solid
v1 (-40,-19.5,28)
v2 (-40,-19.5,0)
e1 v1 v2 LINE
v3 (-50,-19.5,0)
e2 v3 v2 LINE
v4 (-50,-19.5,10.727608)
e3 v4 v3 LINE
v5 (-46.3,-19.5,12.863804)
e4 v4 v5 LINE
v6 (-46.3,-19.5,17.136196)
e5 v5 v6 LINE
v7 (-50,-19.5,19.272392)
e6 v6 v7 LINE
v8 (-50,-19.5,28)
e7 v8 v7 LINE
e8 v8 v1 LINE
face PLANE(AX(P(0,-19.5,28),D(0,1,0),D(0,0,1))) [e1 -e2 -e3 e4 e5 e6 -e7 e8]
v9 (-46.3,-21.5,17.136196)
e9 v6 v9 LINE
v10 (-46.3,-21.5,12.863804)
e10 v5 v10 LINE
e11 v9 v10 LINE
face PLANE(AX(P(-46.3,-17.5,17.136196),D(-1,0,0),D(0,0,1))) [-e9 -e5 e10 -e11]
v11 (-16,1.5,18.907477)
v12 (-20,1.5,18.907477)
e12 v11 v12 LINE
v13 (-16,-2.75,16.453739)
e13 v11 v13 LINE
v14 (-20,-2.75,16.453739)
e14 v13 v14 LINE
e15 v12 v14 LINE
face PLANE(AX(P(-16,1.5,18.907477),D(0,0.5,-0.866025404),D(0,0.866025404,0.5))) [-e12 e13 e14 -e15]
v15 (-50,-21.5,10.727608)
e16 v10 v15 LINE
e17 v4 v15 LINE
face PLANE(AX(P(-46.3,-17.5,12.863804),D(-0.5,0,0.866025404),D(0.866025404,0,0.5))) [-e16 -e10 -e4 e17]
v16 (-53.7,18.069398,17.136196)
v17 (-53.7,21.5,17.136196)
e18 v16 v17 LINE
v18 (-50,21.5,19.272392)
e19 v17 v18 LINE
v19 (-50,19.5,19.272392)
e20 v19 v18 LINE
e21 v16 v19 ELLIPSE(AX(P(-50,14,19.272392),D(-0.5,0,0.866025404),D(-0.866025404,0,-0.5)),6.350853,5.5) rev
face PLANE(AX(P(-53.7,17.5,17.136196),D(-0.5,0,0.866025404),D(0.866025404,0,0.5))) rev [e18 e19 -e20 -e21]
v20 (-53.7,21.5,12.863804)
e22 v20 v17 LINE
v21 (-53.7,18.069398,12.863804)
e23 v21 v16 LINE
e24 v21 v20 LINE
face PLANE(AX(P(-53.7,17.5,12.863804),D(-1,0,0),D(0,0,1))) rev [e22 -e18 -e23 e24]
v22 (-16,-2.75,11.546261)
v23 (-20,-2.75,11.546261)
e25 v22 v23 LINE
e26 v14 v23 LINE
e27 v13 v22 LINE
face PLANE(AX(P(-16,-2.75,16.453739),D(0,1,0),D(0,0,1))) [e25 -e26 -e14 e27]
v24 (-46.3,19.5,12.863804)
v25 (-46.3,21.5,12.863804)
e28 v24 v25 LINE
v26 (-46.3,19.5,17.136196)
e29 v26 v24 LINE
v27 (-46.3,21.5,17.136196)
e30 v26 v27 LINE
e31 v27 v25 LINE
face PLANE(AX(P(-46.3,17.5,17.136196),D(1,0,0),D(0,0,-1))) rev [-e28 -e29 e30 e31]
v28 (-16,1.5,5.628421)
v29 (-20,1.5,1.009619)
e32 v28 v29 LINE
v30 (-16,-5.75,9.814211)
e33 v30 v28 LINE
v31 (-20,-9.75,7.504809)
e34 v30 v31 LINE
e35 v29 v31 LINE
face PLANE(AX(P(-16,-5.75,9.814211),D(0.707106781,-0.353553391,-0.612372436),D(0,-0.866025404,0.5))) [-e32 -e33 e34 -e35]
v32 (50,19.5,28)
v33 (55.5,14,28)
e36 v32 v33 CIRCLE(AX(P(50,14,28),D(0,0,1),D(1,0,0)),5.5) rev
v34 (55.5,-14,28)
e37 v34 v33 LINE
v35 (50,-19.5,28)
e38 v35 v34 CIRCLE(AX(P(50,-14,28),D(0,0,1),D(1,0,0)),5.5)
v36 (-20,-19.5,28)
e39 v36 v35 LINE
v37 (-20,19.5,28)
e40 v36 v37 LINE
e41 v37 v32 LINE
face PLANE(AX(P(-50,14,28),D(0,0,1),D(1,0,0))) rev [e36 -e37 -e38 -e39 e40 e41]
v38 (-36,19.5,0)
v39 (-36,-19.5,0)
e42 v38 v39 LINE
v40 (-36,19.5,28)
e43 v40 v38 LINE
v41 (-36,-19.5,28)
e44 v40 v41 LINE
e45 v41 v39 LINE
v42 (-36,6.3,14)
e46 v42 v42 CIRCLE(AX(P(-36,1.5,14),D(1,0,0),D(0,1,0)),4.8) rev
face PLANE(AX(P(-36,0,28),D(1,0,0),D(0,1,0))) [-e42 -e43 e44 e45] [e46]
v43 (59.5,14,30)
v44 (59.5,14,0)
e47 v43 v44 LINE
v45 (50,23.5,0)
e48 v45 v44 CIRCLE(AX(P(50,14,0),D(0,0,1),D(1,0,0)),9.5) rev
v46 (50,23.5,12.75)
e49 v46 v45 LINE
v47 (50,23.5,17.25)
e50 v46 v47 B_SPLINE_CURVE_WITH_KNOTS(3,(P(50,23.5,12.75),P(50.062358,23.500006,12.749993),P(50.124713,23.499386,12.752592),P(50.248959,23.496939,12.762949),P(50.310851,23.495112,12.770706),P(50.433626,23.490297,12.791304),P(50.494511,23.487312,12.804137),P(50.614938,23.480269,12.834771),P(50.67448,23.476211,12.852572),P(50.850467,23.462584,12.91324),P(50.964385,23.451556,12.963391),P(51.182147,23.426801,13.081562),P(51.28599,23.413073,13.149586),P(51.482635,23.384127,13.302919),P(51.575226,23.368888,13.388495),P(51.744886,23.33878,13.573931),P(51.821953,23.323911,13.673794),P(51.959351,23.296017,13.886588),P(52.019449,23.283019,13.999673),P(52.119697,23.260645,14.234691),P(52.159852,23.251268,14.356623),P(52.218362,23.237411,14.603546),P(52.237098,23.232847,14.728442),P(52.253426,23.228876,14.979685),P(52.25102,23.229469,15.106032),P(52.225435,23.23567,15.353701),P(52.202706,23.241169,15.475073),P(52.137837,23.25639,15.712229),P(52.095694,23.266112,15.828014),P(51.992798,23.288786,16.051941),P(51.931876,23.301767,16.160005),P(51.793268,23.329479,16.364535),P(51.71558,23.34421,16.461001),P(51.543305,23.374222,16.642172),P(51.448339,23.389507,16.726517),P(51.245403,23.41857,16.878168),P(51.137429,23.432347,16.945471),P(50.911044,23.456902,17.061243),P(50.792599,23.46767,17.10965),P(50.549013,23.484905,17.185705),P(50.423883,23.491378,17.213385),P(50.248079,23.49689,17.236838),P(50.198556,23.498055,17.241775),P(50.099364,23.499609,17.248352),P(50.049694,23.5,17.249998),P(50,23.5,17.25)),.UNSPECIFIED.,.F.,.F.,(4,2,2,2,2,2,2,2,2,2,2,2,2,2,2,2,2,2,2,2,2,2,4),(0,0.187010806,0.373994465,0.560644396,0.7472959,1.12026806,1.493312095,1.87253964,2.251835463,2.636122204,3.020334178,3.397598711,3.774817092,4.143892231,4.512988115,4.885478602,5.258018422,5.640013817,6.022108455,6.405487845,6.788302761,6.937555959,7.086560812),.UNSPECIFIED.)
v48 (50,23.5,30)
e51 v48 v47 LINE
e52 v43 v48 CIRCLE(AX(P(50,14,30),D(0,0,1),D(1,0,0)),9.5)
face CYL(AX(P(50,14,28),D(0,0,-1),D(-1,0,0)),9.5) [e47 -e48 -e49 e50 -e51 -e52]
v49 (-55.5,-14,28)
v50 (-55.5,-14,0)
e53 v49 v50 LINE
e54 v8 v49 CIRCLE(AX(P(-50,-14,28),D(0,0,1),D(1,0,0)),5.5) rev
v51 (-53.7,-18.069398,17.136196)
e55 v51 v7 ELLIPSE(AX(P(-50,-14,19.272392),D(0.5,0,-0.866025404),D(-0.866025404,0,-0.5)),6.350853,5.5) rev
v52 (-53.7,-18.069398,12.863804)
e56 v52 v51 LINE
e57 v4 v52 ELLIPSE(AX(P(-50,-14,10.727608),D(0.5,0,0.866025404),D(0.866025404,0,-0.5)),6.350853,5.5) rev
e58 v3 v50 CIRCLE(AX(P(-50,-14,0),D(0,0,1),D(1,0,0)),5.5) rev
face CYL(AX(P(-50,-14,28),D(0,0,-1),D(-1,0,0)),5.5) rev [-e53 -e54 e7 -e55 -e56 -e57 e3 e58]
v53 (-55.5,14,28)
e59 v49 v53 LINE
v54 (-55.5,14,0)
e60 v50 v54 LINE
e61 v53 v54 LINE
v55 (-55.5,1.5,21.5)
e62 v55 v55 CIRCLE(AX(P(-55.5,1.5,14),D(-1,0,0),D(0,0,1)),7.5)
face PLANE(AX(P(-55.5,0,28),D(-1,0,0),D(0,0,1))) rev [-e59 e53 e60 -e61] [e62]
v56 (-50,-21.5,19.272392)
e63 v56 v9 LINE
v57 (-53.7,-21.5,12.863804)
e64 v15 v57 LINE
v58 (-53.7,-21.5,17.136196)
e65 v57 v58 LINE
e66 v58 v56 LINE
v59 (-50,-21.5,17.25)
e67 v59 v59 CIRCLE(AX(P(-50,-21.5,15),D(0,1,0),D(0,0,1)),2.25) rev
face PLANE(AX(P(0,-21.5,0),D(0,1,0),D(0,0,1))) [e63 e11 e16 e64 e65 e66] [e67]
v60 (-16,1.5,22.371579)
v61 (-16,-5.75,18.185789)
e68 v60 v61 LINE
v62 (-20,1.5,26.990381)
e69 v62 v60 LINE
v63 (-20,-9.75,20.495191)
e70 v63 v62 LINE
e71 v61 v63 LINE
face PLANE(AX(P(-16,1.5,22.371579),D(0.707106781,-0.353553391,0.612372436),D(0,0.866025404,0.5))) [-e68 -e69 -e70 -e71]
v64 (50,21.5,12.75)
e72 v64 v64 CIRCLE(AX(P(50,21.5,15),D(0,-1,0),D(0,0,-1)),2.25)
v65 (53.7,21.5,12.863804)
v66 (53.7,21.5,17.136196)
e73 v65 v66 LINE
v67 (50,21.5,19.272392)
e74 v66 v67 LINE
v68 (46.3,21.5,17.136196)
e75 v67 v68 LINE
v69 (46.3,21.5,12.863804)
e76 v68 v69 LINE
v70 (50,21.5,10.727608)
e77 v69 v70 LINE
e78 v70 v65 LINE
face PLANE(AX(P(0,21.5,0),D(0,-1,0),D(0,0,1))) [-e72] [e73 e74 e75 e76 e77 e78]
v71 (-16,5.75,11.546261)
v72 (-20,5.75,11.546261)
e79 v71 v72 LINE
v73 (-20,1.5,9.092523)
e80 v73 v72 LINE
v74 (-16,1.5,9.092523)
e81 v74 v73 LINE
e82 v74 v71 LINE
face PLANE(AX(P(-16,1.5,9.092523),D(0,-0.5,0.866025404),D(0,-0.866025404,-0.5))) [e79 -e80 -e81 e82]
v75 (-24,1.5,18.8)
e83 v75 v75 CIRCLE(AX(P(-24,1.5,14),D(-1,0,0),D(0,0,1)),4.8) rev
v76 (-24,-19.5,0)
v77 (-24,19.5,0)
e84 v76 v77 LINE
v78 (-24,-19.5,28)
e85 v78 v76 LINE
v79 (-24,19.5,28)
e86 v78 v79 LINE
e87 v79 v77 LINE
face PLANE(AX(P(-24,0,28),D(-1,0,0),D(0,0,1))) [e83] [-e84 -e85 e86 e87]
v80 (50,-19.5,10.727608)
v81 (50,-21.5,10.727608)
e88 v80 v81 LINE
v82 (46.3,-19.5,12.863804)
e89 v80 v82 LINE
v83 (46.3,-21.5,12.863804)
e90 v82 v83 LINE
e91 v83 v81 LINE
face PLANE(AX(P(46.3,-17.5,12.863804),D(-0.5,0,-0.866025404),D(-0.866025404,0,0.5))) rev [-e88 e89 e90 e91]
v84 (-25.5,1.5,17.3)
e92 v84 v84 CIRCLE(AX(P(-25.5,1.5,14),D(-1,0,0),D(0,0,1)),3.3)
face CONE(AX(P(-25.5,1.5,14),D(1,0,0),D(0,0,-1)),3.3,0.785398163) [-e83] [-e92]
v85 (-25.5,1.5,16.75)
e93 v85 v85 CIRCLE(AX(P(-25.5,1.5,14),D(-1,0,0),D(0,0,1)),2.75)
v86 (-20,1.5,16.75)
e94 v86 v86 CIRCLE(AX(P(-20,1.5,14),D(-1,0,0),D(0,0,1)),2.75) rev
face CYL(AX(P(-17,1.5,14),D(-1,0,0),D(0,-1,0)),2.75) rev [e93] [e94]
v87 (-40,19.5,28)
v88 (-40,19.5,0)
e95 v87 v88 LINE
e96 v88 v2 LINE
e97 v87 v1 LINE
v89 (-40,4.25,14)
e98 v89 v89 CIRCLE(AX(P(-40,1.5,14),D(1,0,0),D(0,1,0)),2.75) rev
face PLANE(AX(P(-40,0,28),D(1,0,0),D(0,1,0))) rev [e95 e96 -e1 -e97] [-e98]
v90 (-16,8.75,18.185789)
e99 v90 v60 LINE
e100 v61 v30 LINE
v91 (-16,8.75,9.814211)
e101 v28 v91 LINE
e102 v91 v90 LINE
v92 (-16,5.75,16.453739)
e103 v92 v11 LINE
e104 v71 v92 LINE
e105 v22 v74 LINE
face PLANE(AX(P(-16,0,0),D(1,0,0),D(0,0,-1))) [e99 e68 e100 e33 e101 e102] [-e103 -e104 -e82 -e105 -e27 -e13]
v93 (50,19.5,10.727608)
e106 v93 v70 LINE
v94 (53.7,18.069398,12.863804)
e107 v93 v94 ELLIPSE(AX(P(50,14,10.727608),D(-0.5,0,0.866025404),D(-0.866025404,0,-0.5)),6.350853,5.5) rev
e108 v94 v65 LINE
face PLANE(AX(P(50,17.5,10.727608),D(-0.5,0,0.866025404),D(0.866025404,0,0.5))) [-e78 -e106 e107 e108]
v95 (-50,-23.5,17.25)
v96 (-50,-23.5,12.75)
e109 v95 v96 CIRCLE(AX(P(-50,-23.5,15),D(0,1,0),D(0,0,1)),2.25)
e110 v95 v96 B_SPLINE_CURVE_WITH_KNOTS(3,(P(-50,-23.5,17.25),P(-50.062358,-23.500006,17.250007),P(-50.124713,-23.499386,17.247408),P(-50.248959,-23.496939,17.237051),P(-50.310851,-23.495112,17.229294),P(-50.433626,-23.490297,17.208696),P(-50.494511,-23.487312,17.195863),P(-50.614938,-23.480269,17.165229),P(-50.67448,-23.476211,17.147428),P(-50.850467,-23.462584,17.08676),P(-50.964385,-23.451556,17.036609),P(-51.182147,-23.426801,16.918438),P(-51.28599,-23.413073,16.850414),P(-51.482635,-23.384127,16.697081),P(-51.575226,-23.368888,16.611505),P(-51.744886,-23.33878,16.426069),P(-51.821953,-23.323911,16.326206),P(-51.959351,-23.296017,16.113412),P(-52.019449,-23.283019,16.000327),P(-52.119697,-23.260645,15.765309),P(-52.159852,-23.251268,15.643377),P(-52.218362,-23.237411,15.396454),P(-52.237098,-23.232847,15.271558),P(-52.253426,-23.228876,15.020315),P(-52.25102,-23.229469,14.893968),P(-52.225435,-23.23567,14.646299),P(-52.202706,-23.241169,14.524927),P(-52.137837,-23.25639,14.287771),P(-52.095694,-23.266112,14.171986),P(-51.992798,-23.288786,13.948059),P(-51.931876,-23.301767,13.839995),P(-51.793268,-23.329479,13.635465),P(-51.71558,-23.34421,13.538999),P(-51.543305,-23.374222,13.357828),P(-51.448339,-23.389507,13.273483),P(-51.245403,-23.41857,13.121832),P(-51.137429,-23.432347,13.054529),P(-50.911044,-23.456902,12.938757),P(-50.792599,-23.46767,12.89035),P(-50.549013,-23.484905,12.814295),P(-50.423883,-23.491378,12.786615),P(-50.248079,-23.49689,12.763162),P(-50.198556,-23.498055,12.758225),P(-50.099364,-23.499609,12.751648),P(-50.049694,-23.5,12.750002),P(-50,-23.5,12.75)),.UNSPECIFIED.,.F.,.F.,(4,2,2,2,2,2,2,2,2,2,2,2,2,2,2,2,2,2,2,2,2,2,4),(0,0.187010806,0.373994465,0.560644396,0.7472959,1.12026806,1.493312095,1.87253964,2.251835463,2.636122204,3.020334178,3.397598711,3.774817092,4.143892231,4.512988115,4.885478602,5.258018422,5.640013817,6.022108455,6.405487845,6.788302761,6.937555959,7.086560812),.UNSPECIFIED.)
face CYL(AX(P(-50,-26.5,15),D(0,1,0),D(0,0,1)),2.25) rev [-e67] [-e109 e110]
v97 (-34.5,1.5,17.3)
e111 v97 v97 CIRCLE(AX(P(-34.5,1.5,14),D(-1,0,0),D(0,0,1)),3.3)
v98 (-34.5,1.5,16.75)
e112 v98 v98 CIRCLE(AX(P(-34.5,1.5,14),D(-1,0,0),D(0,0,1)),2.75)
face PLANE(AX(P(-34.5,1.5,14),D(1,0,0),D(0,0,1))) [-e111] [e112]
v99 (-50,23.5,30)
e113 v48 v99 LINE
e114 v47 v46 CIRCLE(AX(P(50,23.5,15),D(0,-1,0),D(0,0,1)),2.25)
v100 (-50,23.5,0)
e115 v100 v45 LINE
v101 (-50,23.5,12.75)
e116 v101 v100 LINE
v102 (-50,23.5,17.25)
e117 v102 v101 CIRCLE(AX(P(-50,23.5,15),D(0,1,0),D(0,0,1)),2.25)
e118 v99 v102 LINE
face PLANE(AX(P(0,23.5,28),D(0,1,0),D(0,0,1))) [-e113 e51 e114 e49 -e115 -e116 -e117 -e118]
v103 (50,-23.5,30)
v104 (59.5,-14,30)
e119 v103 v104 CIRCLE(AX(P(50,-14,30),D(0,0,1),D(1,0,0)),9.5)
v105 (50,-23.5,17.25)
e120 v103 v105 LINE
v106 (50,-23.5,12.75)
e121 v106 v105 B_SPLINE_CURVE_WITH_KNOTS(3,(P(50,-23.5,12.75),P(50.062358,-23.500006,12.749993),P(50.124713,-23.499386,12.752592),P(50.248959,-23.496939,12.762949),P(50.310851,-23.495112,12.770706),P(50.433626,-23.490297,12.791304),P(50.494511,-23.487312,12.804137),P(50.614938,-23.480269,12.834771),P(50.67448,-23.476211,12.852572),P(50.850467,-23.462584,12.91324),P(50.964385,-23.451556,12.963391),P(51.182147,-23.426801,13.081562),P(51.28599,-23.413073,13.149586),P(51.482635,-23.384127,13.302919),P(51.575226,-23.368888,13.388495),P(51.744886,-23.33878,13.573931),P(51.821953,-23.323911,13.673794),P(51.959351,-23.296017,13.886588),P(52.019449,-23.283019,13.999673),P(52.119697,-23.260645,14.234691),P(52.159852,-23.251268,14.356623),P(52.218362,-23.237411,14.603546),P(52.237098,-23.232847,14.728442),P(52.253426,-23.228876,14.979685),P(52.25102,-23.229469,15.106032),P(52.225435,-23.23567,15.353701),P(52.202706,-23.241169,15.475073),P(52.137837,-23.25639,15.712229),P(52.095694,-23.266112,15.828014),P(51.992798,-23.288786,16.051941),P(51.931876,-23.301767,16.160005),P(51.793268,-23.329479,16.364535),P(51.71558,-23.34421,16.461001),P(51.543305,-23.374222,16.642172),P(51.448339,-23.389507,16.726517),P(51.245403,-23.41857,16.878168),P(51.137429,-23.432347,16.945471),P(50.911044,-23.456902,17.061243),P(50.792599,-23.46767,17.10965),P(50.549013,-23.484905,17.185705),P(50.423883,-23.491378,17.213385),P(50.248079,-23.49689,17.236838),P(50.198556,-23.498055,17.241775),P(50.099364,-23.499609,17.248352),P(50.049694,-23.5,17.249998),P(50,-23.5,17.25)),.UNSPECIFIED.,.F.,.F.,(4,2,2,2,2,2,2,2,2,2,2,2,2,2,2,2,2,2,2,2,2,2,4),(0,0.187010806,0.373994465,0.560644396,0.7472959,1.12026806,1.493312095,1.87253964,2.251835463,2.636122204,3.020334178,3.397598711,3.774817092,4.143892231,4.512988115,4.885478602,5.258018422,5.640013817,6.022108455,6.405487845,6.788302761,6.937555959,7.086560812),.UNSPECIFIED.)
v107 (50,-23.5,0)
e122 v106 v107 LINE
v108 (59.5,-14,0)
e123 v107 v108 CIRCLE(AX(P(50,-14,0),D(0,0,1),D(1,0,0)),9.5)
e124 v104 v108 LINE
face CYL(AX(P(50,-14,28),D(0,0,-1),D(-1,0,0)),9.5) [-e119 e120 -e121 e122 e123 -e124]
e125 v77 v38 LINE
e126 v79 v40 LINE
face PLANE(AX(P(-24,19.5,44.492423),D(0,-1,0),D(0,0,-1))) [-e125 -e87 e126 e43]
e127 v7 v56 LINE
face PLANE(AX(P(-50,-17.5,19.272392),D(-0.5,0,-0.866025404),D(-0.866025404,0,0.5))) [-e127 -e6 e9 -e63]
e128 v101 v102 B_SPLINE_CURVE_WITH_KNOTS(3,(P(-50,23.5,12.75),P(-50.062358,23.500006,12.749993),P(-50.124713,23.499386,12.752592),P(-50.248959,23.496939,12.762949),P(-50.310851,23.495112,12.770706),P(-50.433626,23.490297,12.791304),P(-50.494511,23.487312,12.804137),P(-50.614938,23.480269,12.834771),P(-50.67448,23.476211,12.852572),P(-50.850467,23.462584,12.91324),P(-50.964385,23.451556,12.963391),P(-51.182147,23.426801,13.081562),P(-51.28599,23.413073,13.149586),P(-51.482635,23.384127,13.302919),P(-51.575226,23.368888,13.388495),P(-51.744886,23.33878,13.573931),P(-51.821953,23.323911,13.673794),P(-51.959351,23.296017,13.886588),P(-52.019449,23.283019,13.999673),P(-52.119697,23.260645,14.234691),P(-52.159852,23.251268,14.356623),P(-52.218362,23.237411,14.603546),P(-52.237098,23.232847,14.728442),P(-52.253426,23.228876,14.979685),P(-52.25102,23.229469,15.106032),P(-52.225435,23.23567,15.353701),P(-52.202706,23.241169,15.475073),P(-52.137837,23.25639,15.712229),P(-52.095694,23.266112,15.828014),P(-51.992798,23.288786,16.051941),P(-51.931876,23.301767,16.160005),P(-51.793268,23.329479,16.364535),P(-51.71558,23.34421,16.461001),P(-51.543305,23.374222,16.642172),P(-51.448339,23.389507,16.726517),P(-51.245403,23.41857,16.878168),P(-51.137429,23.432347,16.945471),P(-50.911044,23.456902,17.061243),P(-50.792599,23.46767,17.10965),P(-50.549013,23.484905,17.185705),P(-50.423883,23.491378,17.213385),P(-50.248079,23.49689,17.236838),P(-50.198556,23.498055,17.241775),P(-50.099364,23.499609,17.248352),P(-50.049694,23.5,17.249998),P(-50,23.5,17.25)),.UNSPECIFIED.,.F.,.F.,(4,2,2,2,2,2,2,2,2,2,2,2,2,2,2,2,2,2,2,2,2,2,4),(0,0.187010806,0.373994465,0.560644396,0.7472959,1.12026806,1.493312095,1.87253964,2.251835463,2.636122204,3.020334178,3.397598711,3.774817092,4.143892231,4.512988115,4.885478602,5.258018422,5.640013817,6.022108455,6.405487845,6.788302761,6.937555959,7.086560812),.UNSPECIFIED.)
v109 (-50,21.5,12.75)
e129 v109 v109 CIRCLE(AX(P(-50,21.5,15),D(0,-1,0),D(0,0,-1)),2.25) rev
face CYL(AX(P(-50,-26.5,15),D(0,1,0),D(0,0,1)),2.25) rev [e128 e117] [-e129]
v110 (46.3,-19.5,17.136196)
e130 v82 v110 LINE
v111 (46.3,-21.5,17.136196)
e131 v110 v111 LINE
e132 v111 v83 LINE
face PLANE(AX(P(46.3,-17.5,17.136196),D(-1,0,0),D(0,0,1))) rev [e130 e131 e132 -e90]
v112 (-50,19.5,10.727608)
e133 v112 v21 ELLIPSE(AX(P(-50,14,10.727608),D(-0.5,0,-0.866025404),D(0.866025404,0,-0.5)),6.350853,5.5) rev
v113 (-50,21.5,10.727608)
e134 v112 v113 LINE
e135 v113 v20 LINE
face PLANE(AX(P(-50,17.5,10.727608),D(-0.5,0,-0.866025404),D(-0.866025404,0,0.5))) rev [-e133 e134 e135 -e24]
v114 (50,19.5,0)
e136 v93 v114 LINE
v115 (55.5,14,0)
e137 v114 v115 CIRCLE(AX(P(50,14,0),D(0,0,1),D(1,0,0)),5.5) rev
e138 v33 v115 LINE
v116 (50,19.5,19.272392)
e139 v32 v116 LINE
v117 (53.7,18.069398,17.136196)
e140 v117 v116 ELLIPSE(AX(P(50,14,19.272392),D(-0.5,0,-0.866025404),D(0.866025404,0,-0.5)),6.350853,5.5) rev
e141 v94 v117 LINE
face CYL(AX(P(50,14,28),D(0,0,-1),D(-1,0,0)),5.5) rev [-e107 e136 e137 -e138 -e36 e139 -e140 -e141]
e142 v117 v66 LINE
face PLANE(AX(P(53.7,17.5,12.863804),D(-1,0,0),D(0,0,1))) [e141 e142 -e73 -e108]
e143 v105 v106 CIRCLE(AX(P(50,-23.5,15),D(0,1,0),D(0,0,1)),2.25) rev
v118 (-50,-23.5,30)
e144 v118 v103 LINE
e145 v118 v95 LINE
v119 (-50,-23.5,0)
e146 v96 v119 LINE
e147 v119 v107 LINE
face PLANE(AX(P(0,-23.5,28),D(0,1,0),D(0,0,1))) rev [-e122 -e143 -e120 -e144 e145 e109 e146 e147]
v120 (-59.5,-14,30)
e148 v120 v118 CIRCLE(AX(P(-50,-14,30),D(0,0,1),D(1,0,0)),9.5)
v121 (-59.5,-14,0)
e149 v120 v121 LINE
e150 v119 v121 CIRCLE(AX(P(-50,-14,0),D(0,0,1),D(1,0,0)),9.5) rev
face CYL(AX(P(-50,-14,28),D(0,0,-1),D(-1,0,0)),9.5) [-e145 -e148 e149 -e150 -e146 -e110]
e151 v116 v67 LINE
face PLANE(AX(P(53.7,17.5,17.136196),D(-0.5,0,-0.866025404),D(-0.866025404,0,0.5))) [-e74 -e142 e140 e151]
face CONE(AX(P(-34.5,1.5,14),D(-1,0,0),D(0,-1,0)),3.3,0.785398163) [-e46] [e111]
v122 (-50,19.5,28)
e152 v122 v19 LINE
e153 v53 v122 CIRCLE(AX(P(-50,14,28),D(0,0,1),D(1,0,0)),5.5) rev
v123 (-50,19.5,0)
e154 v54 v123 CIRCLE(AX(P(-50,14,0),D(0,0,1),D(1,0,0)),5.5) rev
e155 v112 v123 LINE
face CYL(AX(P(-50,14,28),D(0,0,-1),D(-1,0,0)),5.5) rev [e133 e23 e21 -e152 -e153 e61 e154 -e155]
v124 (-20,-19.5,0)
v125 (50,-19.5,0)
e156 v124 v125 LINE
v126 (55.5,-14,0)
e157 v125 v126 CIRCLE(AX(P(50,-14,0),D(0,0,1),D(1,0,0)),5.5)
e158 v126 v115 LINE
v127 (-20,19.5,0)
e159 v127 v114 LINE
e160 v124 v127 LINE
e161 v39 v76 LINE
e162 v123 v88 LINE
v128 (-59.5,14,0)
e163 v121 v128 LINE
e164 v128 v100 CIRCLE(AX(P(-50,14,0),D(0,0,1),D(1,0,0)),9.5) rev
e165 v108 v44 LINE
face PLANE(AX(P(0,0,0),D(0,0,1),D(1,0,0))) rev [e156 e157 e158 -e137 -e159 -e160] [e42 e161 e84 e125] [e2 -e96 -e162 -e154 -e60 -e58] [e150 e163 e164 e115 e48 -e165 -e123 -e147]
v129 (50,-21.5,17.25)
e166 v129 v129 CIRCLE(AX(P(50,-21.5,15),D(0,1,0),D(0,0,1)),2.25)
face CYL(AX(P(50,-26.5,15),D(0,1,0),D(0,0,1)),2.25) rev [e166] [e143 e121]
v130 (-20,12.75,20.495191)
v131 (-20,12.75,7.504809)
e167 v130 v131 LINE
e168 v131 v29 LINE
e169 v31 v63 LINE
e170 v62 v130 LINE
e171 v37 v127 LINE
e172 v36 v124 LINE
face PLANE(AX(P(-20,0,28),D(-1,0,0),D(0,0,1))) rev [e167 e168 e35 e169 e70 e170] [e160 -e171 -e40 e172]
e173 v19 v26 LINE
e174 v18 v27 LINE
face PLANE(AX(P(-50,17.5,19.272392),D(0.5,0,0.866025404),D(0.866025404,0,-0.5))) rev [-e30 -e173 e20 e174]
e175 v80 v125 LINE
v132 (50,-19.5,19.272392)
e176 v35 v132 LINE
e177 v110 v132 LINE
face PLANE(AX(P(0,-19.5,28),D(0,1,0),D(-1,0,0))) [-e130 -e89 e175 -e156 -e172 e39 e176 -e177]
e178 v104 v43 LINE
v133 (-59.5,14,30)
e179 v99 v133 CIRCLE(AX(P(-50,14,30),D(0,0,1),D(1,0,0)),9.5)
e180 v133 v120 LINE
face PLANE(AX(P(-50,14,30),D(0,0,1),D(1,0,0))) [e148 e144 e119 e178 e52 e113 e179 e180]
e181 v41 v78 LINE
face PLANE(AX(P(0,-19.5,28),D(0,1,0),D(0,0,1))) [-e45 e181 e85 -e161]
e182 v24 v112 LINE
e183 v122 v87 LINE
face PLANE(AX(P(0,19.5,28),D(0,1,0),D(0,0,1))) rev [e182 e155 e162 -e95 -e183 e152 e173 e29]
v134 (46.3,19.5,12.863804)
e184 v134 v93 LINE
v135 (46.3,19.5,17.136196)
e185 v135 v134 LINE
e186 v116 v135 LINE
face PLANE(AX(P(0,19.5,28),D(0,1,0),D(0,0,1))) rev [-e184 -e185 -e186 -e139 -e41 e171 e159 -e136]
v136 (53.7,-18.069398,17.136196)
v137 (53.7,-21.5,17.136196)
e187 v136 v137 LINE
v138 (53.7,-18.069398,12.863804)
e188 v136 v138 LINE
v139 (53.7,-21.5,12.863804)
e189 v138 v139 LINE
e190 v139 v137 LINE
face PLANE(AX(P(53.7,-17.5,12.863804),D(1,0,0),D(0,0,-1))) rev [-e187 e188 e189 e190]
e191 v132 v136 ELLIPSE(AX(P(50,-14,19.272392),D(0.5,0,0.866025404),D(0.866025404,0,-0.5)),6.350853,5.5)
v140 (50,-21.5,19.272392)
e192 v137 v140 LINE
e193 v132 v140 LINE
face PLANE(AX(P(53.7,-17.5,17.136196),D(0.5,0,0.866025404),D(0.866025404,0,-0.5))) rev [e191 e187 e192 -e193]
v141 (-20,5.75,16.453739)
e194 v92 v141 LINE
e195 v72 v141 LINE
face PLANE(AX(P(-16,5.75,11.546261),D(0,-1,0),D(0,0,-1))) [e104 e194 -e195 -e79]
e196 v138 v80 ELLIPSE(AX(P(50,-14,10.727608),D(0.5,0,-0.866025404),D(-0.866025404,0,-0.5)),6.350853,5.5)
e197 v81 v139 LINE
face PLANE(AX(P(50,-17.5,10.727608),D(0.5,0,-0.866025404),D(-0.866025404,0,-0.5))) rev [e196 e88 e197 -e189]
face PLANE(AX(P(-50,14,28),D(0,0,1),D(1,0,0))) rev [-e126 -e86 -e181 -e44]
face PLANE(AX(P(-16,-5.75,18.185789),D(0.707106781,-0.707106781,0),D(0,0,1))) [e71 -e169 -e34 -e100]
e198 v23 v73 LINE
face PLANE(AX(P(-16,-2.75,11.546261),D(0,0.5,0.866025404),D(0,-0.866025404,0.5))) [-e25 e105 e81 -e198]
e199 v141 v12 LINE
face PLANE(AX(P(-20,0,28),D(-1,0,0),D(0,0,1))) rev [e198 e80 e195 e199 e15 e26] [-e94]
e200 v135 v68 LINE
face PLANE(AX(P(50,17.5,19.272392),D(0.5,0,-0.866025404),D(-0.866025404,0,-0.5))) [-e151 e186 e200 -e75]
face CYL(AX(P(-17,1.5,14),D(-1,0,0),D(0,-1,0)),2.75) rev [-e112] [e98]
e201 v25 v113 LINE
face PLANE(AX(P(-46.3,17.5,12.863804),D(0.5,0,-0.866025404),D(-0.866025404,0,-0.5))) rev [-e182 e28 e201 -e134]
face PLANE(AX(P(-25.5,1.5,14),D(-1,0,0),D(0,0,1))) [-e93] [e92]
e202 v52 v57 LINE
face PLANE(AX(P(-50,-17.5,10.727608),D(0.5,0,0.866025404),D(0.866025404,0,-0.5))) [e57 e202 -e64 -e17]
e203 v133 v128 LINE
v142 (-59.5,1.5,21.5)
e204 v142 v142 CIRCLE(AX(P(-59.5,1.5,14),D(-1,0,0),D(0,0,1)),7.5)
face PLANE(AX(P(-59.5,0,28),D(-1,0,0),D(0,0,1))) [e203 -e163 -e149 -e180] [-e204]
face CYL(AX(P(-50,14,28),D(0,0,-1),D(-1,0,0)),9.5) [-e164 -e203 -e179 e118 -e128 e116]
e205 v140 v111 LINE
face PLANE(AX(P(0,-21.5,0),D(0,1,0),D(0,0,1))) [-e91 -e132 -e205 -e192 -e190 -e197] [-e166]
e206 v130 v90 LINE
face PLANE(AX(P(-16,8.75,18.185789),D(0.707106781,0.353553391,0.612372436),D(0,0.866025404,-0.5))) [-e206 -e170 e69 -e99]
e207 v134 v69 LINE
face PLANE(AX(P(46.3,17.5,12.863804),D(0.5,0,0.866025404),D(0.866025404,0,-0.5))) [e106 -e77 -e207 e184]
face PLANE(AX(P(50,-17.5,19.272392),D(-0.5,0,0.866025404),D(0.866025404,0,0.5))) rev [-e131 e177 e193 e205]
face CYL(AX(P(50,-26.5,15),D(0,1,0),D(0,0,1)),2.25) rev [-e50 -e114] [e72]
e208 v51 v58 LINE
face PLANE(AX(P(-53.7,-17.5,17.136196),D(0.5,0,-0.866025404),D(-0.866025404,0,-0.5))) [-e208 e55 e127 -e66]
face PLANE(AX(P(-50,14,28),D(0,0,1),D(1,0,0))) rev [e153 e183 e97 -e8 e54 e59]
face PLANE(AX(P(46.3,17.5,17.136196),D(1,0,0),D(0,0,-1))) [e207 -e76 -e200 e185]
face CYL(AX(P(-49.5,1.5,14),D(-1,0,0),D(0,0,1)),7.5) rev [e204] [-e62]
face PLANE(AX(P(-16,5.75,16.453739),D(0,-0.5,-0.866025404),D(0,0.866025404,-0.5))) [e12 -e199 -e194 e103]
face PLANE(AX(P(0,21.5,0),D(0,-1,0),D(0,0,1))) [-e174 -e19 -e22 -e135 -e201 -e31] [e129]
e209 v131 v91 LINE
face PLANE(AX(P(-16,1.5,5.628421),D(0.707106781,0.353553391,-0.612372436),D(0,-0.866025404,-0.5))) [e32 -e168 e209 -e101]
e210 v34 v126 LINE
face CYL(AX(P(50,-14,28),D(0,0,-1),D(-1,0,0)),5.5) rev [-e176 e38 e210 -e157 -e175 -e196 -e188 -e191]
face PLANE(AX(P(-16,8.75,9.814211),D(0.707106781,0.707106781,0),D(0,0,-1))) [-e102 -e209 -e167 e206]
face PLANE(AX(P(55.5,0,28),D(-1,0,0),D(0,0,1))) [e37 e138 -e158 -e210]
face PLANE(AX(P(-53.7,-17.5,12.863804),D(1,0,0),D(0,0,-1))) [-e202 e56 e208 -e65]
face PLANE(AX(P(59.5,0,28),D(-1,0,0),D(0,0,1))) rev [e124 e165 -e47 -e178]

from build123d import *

# Parameters (mm, degrees)
BOSS_EXTRUDE1_DEPTH     = 28
CUT_EXTRUDE1_DEPTH      = 19
CUT_EXTRUDE1_DEPTH_BACK = 52
SKETCH3_R               = 2.75
BOSS_EXTRUDE2_DEPTH     = 2
SKETCH5_R               = 2.25
CUT_EXTRUDE2_DEPTH      = 50
CUT_EXTRUDE3_DEPTH      = 2
MIRROR3_COPY_1_DEPTH    = 2
SKETCH7_R               = 7.5
CUT_EXTRUDE4_DEPTH      = 10
BOSS_EXTRUDE3_DEPTH     = 4
CHAMFER1_SIZE           = 4
SKETCH9_R               = 3.3
SKETCH9_R_2             = 2.75
BOSS_EXTRUDE4_DEPTH     = 1.5
CHAMFER2_SIZE           = 1.5
CHAMFER3_SIZE           = 1.5
SKETCH10_W              = 16
SKETCH10_H              = 4
BOSS_EXTRUDE5_DEPTH     = 28


with BuildPart() as part:
    # Sketch2 → Boss-Extrude1 (new body)
    with BuildSketch(Plane.XY):
        with BuildLine():
            ThreePointArc((-59.5, 14), (-56.717514421, 20.717514421), (-50, 23.5))
            Line((-50, 23.5), (-36, 23.5))
            Line((-36, 23.5), (-36, -19.5))
            Line((-36, -19.5), (-24, -19.5))
            Line((-24, -19.5), (-24, 23.5))
            Line((-24, 23.5), (50, 23.5))
            ThreePointArc((50, 23.5), (56.717514421, 20.717514421), (59.5, 14))
            Line((59.5, 14), (59.5, -14))
            ThreePointArc((59.5, -14), (56.717514421, -20.717514421), (50, -23.5))
            Line((50, -23.5), (-50, -23.5))
            ThreePointArc((-50, -23.5), (-56.717514421, -20.717514421), (-59.5, -14))
            Line((-59.5, -14), (-59.5, 14))
        make_face()
        with BuildLine():
            ThreePointArc((50, -19.5), (53.889087297, -17.889087297), (55.5, -14))
            Line((55.5, -14), (55.5, 14))
            ThreePointArc((55.5, 14), (53.889087297, 17.889087297), (50, 19.5))
            Line((50, 19.5), (-20, 19.5))
            Line((-20, 19.5), (-20, -19.5))
            Line((-20, -19.5), (50, -19.5))
        make_face(mode=Mode.SUBTRACT)
        with BuildLine():
            Line((-55.5, -14), (-55.5, 14))
            ThreePointArc((-55.5, 14), (-53.889087297, 17.889087297), (-50, 19.5))
            Line((-50, 19.5), (-40, 19.5))
            Line((-40, 19.5), (-40, -19.5))
            Line((-40, -19.5), (-50, -19.5))
            ThreePointArc((-50, -19.5), (-53.889087297, -17.889087297), (-55.5, -14))
        make_face(mode=Mode.SUBTRACT)
    extrude(amount=BOSS_EXTRUDE1_DEPTH)

    # Sketch3 → Cut-Extrude1 (cut, two sides: drawn at the far end of the back side and taken through both)
    with BuildSketch(Plane(origin=(-36, 0, 0), x_dir=(0, 0, -1), z_dir=(1, 0, 0)).offset(-CUT_EXTRUDE1_DEPTH_BACK)):
        with Locations(Location((-14, 1.5, 0), (0, 0, 180))):
            Circle(SKETCH3_R)
    extrude(amount=CUT_EXTRUDE1_DEPTH + CUT_EXTRUDE1_DEPTH_BACK, mode=Mode.SUBTRACT)

    # Sketch4 → Boss-Extrude2 (add)
    with BuildSketch(Plane.XY.offset(28)):
        with BuildLine():
            Line((50, 23.5), (-36, 23.5))
            Line((-36, 23.5), (-50, 23.5))
            ThreePointArc((-50, 23.5), (-56.717514421, 20.717514421), (-59.5, 14))
            Line((-59.5, 14), (-59.5, -14))
            ThreePointArc((-59.5, -14), (-56.717514421, -20.717514421), (-50, -23.5))
            Line((-50, -23.5), (50, -23.5))
            ThreePointArc((50, -23.5), (56.717514421, -20.717514421), (59.5, -14))
            Line((59.5, -14), (59.5, 14))
            ThreePointArc((59.5, 14), (56.717514421, 20.717514421), (50, 23.5))
        make_face()
    extrude(amount=BOSS_EXTRUDE2_DEPTH)

    # Sketch5 → Cut-Extrude2 (cut)
    with BuildSketch(Plane(origin=(0, 23.5, 0), x_dir=(1, 0, 0), z_dir=(0, 1, 0))):
        with Locations(Location((-50, -15, 0), (0, 0, 270))):
            Circle(SKETCH5_R)
    cut_extrude2 = extrude(amount=-CUT_EXTRUDE2_DEPTH, mode=Mode.SUBTRACT)

    # Sketch6 → Cut-Extrude3 (cut, symmetric)
    with BuildSketch(Plane(origin=(0, -19.5, 0), x_dir=(1, 0, 0), z_dir=(0, 1, 0))):
        Polygon((-50, -19.272391992), (-46.3, -17.136195996), (-46.3, -12.863804004), (-50, -10.727608008), (-53.7, -12.863804004), (-53.7, -17.136195996), align=None)
    cut_extrude3 = extrude(amount=CUT_EXTRUDE3_DEPTH, both=True, mode=Mode.SUBTRACT)

    # Mirror1: Cut-Extrude2 across plane
    add(cut_extrude2.mirror(Plane(origin=(0, 0, 0), x_dir=(0, 0, 1), z_dir=(1, 0, 0))), mode=Mode.SUBTRACT)

    # Mirror2: Cut-Extrude3 across plane
    add(cut_extrude3.mirror(Plane.ZX), mode=Mode.SUBTRACT)

    # Mirror3: Cut-Extrude3 across plane
    add(cut_extrude3.mirror(Plane(origin=(0, 0, 0), x_dir=(0, 0, 1), z_dir=(1, 0, 0))), mode=Mode.SUBTRACT)

    # Mirror3 copy 1 sketch → Mirror3 copy 1 (cut, symmetric)
    with BuildSketch(Plane(origin=(0, 19.5, 0), x_dir=(-1, 0, 0), z_dir=(0, -1, 0))):
        Polygon((-50, -19.272391992), (-46.3, -17.136195996), (-46.3, -12.863804004), (-50, -10.727608008), (-53.7, -12.863804004), (-53.7, -17.136195996), align=None)
    extrude(amount=MIRROR3_COPY_1_DEPTH, both=True, mode=Mode.SUBTRACT)

    # Sketch7 → Cut-Extrude4 (cut)
    with BuildSketch(Plane.ZY.offset(59.5)):
        with Locations((14, 1.5)):
            Circle(SKETCH7_R)
    extrude(amount=-CUT_EXTRUDE4_DEPTH, mode=Mode.SUBTRACT)

    # Sketch8 → Boss-Extrude3 (add)
    with BuildSketch(Plane(origin=(-20, 0, 0), x_dir=(0, 0, -1), z_dir=(1, 0, 0))):
        Polygon((-5.628421097, 1.5), (-9.814210548, 8.75), (-18.185789452, 8.75), (-22.371578903, 1.5), (-18.185789452, -5.75), (-9.814210548, -5.75), align=None)
        Polygon((-9.092522712, 1.5), (-11.546261356, 5.75), (-16.453738644, 5.75), (-18.907477288, 1.5), (-16.453738644, -2.75), (-11.546261356, -2.75), align=None, mode=Mode.SUBTRACT)
    extrude(amount=BOSS_EXTRUDE3_DEPTH)

    # Chamfer1
    chamfer1_edges = [part.edges().sort_by_distance(p)[0] for p in [
        (-20, 5.125, 7.721315823),
        (-20, 8.75, 14),
        (-20, 5.125, 20.278684177),
        (-20, -2.125, 20.278684177),
        (-20, -5.75, 14),
        (-20, -2.125, 7.721315823),
    ]]
    chamfer(chamfer1_edges, length=CHAMFER1_SIZE - 0.0001)  # a hair under: the kernel refuses the full size

    # Sketch9 → Boss-Extrude4 (add)
    with BuildSketch(Plane.ZY.offset(24)):
        with Locations((14, 1.5)):
            Circle(SKETCH9_R)
        with Locations((14, 1.5)):
            Circle(SKETCH9_R_2, mode=Mode.SUBTRACT)
    boss_extrude4 = extrude(amount=BOSS_EXTRUDE4_DEPTH)

    # Chamfer2
    chamfer2_edges = [part.edges().sort_by_distance(p)[0] for p in [
        (-24, 1.5, 10.7),
    ]]
    chamfer(chamfer2_edges, length=CHAMFER2_SIZE - 0.0001)  # a hair under: the kernel refuses the full size

    # Mirror6: Boss-Extrude4 across plane
    add(boss_extrude4.mirror(Plane(origin=(-30, 0, 0), x_dir=(0, 0, 1), z_dir=(1, 0, 0))))

    # Chamfer3
    chamfer3_edges = [part.edges().sort_by_distance(p)[0] for p in [
        (-36, 1.5, 10.7),
    ]]
    chamfer(chamfer3_edges, length=CHAMFER3_SIZE - 0.0001)  # a hair under: the kernel refuses the full size

    # Sketch10 → Boss-Extrude5 (add)
    with BuildSketch(Plane(origin=(0, 0, 0), x_dir=(-1, 0, 0), z_dir=(0, 0, -1))):
        with Locations((32, 21.5)):
            Rectangle(SKETCH10_W, SKETCH10_H)
    extrude(amount=-BOSS_EXTRUDE5_DEPTH)


solid = part.part
